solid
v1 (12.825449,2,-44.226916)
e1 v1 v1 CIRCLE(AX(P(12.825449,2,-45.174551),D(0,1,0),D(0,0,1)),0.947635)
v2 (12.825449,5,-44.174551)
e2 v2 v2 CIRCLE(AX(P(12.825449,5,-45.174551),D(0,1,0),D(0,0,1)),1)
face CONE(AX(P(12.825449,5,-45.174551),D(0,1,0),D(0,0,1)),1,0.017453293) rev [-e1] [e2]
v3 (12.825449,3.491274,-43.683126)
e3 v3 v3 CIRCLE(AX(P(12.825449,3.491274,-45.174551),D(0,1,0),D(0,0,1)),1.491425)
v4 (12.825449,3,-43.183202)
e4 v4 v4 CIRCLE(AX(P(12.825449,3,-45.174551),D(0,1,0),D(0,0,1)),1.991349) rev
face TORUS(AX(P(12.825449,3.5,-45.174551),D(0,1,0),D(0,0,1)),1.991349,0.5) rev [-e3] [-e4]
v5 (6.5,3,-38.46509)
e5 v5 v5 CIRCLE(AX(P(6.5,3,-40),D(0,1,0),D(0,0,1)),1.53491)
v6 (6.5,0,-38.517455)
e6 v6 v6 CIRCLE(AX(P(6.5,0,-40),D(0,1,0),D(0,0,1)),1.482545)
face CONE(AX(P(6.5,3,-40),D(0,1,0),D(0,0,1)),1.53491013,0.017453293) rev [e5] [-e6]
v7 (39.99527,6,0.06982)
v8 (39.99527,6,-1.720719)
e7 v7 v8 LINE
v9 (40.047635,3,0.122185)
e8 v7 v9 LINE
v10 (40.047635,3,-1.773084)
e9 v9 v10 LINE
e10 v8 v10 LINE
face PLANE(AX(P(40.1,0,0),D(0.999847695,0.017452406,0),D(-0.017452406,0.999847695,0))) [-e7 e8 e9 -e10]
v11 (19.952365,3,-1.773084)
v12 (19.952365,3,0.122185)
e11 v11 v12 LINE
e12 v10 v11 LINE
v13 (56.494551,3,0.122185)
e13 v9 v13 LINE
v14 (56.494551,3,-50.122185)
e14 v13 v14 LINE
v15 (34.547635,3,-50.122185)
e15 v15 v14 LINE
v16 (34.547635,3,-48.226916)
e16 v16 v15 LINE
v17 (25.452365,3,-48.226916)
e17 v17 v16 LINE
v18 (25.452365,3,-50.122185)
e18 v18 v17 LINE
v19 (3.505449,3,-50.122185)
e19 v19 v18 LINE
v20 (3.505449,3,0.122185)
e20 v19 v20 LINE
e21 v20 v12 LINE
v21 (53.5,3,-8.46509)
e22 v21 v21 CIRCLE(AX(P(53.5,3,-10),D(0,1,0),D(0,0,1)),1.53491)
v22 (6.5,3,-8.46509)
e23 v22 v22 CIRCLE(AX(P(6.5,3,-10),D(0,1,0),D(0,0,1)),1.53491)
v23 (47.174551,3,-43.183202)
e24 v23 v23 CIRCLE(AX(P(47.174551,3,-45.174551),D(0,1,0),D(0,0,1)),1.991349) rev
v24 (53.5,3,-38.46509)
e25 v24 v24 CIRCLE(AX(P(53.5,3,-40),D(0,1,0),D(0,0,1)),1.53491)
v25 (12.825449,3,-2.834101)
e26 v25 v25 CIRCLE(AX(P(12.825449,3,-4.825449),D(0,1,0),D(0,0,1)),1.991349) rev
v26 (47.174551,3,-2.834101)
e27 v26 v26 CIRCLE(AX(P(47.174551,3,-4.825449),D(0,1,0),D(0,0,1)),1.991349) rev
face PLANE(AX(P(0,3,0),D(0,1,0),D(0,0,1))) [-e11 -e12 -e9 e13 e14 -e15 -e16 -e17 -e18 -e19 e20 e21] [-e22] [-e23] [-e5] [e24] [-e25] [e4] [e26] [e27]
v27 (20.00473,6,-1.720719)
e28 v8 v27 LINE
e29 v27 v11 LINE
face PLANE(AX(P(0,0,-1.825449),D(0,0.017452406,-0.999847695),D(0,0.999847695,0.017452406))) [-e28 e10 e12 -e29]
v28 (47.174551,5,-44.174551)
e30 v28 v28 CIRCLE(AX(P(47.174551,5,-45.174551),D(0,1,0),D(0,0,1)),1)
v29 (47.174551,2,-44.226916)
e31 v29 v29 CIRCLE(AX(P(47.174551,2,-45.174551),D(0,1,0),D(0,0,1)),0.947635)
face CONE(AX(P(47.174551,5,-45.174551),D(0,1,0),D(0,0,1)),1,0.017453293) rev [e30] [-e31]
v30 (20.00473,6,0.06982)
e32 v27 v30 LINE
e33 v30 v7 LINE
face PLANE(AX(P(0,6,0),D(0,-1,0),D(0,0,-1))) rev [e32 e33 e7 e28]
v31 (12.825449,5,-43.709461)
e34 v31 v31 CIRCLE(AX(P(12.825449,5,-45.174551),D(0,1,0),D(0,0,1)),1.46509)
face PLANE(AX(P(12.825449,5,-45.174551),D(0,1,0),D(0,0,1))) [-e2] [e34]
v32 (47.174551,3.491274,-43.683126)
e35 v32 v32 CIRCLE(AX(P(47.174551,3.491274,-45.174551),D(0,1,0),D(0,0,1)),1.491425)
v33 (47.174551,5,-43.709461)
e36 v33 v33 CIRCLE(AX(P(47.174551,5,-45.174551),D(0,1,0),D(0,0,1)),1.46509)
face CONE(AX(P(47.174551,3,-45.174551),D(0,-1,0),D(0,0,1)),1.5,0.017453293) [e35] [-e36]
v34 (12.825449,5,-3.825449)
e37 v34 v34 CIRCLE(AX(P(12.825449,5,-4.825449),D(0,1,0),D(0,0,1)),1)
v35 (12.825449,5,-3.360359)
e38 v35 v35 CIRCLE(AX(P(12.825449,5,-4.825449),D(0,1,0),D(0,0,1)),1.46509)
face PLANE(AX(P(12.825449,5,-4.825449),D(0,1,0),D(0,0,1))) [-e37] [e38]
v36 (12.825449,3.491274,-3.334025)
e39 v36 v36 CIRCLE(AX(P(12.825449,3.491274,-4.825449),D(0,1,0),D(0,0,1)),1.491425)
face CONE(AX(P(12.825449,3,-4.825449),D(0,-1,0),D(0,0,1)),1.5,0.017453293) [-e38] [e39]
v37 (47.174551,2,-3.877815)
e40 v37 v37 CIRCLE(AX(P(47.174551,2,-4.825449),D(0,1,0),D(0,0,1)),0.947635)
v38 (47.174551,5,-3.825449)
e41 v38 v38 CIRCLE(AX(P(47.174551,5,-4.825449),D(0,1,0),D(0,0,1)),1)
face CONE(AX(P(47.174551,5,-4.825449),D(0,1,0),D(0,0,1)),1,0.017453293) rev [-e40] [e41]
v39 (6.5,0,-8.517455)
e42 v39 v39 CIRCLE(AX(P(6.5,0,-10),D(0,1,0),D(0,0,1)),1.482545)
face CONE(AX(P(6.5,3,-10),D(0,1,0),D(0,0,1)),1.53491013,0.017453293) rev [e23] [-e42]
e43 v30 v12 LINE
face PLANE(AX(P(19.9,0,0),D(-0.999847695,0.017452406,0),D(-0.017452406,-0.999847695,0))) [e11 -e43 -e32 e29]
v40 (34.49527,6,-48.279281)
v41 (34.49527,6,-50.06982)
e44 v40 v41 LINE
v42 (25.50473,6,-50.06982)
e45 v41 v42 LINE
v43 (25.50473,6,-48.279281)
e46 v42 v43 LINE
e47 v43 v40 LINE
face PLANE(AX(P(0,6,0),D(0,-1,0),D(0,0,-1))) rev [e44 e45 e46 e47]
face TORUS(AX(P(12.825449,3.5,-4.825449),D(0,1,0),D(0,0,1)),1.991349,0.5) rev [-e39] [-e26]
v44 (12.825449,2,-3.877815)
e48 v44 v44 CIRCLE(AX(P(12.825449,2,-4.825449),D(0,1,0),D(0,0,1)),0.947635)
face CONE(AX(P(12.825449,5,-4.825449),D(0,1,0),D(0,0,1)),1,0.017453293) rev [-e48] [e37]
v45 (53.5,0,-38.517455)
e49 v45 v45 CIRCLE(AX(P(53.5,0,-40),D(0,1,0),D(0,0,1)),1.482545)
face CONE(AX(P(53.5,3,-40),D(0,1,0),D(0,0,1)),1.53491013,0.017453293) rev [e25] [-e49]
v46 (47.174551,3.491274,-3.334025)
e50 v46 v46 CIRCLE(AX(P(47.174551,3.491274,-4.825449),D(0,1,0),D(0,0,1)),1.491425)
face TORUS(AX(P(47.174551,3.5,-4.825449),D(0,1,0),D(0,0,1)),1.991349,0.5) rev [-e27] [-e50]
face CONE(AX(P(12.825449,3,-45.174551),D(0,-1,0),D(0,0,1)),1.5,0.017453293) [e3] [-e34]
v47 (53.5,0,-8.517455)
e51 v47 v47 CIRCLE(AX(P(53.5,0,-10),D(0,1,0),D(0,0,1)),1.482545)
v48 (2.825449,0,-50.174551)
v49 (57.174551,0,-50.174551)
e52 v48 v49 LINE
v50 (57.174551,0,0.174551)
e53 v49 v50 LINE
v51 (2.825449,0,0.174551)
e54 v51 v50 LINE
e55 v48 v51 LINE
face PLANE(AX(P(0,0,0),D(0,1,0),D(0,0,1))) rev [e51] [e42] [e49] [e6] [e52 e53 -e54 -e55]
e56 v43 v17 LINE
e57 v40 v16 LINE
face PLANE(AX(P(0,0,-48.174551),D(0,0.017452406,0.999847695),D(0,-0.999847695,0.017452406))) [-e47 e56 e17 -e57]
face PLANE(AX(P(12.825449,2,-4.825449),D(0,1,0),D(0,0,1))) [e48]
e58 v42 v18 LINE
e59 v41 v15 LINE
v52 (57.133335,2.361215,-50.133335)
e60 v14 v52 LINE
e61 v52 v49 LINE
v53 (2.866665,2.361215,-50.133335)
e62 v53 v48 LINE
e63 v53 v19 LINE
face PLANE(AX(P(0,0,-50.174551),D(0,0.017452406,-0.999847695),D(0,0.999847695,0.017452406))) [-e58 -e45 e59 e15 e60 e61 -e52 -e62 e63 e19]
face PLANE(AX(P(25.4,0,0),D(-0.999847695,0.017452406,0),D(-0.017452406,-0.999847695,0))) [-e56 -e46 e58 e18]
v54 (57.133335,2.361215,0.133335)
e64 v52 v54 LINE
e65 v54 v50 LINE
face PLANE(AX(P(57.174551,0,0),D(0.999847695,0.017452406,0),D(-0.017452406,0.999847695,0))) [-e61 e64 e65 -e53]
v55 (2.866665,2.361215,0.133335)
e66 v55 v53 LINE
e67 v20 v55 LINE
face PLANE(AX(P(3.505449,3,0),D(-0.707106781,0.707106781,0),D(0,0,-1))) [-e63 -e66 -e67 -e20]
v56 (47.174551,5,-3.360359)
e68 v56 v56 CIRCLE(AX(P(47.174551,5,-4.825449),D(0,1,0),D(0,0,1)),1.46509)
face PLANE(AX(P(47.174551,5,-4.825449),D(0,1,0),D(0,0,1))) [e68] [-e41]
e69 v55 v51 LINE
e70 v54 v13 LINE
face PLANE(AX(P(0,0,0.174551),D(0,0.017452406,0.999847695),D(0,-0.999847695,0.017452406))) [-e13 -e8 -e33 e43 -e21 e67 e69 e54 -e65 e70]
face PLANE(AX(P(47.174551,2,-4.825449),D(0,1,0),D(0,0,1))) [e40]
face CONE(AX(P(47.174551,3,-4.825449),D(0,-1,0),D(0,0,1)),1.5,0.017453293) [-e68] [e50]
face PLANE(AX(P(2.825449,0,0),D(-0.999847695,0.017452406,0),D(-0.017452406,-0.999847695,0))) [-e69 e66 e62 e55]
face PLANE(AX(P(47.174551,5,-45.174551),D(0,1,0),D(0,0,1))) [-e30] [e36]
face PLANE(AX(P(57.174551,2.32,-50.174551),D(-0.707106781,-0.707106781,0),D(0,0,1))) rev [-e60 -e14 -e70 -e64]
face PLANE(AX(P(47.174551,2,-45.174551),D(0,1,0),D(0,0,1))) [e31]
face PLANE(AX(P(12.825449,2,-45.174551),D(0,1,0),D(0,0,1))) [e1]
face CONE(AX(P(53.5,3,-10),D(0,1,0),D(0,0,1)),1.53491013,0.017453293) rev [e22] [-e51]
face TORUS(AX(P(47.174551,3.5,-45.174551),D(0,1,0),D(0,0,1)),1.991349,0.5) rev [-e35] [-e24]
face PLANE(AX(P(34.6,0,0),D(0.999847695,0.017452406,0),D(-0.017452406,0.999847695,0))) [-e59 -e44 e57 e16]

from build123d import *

# Parameters (mm, degrees)
SKETCH1_W                     = 54.349101298
SKETCH1_H                     = 50.349101298
BOSS_EXTRUDE2_DEPTH           = 3
SKETCH7_R                     = 1.53491013
CUT_EXTRUDE1_DEPTH            = 77.127621628
CUT_EXTRUDE1_DRAFT            = -1
CUT_EXTRUDE1_PROFILE_2_DEPTH  = 77.127621628
CUT_EXTRUDE1_PROFILE_2_DRAFT  = -1
CUT_EXTRUDE1_PROFILE_3_DEPTH  = 77.127621628
CUT_EXTRUDE1_PROFILE_3_DRAFT  = -1
CUT_EXTRUDE1_PROFILE_4_DEPTH  = 77.127621628
CUT_EXTRUDE1_PROFILE_4_DRAFT  = -1
SKETCH8_W                     = 20.2
SKETCH8_H                     = 2
SKETCH8_W_2                   = 9.2
BOSS_EXTRUDE3_DEPTH           = 3
FILLET1_SIZE                  = 0.68
SKETCH9_R                     = 1.5
BOSS_EXTRUDE4_DEPTH           = 2
BOSS_EXTRUDE4_DRAFT           = 1
BOSS_EXTRUDE4_PROFILE_2_DEPTH = 2
BOSS_EXTRUDE4_PROFILE_2_DRAFT = 1
BOSS_EXTRUDE4_PROFILE_3_DEPTH = 2
BOSS_EXTRUDE4_PROFILE_3_DRAFT = 1
BOSS_EXTRUDE4_PROFILE_4_DEPTH = 2
BOSS_EXTRUDE4_PROFILE_4_DRAFT = 1
SKETCH10_R                    = 1
CUT_EXTRUDE2_DEPTH            = 3
CUT_EXTRUDE2_DRAFT            = -1
CUT_EXTRUDE2_PROFILE_2_DEPTH  = 3
CUT_EXTRUDE2_PROFILE_2_DRAFT  = -1
CUT_EXTRUDE2_PROFILE_3_DEPTH  = 3
CUT_EXTRUDE2_PROFILE_3_DRAFT  = -1
CUT_EXTRUDE2_PROFILE_4_DEPTH  = 3
CUT_EXTRUDE2_PROFILE_4_DRAFT  = -1
FILLET2_R                     = 0.5
DRAFT1_ANGLE                  = -1


with BuildPart() as part:
    # Sketch1 → Boss-Extrude2 (new body)
    with BuildSketch(Plane(origin=(0, 0, 0), x_dir=(-1, 0, 0), z_dir=(0, -1, 0))):
        with Locations((-30, 25)):
            Rectangle(SKETCH1_W, SKETCH1_H)
    extrude(amount=-BOSS_EXTRUDE2_DEPTH)


with BuildPart() as cut_extrude1_tool:
    # Sketch7 → Cut-Extrude1 (with draft: the straight prism first)
    with BuildSketch(Plane(origin=(0, 3, 0), x_dir=(1, 0, 0), z_dir=(0, 1, 0))):
        with Locations((6.5, 40)):
            Circle(SKETCH7_R)
    extrude(amount=-CUT_EXTRUDE1_DEPTH)
    # Cut-Extrude1: the draft: its side faces are tilted about the plane it starts from
    cut_extrude1_sides = [cut_extrude1_tool.faces().sort_by_distance(p)[0] for p in [
        (4.96508987, -35.563810814, -40),
    ]]
    draft(cut_extrude1_sides, Plane(origin=(0, 3, 0), x_dir=(1, 0, 0), z_dir=(0, 1, 0)), CUT_EXTRUDE1_DRAFT)


with BuildPart() as part_1:
    add(part.part)

    # Cut-Extrude1: cut by cut_extrude1_tool
    add(cut_extrude1_tool.part, mode=Mode.SUBTRACT)


with BuildPart() as cut_extrude1_profile_2_tool:
    # Sketch7 → Cut-Extrude1 profile 2 (with draft: the straight prism first)
    with BuildSketch(Plane(origin=(0, 3, 0), x_dir=(1, 0, 0), z_dir=(0, 1, 0))):
        with Locations((6.5, 10)):
            Circle(SKETCH7_R)
    extrude(amount=-CUT_EXTRUDE1_PROFILE_2_DEPTH)
    # Cut-Extrude1 profile 2: the draft: its side faces are tilted about the plane it starts from
    cut_extrude1_profile_2_sides = [cut_extrude1_profile_2_tool.faces().sort_by_distance(p)[0] for p in [
        (4.96508987, -35.563810814, -10),
    ]]
    draft(cut_extrude1_profile_2_sides, Plane(origin=(0, 3, 0), x_dir=(1, 0, 0), z_dir=(0, 1, 0)), CUT_EXTRUDE1_PROFILE_2_DRAFT)


with BuildPart() as part_2:
    add(part_1.part)

    # Cut-Extrude1 profile 2: cut by cut_extrude1_profile_2_tool
    add(cut_extrude1_profile_2_tool.part, mode=Mode.SUBTRACT)


with BuildPart() as cut_extrude1_profile_3_tool:
    # Sketch7 → Cut-Extrude1 profile 3 (with draft: the straight prism first)
    with BuildSketch(Plane(origin=(0, 3, 0), x_dir=(1, 0, 0), z_dir=(0, 1, 0))):
        with Locations((53.5, 10)):
            Circle(SKETCH7_R)
    extrude(amount=-CUT_EXTRUDE1_PROFILE_3_DEPTH)
    # Cut-Extrude1 profile 3: the draft: its side faces are tilted about the plane it starts from
    cut_extrude1_profile_3_sides = [cut_extrude1_profile_3_tool.faces().sort_by_distance(p)[0] for p in [
        (51.96508987, -35.563810814, -10),
    ]]
    draft(cut_extrude1_profile_3_sides, Plane(origin=(0, 3, 0), x_dir=(1, 0, 0), z_dir=(0, 1, 0)), CUT_EXTRUDE1_PROFILE_3_DRAFT)


with BuildPart() as part_3:
    add(part_2.part)

    # Cut-Extrude1 profile 3: cut by cut_extrude1_profile_3_tool
    add(cut_extrude1_profile_3_tool.part, mode=Mode.SUBTRACT)


with BuildPart() as cut_extrude1_profile_4_tool:
    # Sketch7 → Cut-Extrude1 profile 4 (with draft: the straight prism first)
    with BuildSketch(Plane(origin=(0, 3, 0), x_dir=(1, 0, 0), z_dir=(0, 1, 0))):
        with Locations((53.5, 40)):
            Circle(SKETCH7_R)
    extrude(amount=-CUT_EXTRUDE1_PROFILE_4_DEPTH)
    # Cut-Extrude1 profile 4: the draft: its side faces are tilted about the plane it starts from
    cut_extrude1_profile_4_sides = [cut_extrude1_profile_4_tool.faces().sort_by_distance(p)[0] for p in [
        (51.96508987, -35.563810814, -40),
    ]]
    draft(cut_extrude1_profile_4_sides, Plane(origin=(0, 3, 0), x_dir=(1, 0, 0), z_dir=(0, 1, 0)), CUT_EXTRUDE1_PROFILE_4_DRAFT)


with BuildPart() as part_4:
    add(part_3.part)

    # Cut-Extrude1 profile 4: cut by cut_extrude1_profile_4_tool
    add(cut_extrude1_profile_4_tool.part, mode=Mode.SUBTRACT)

    # Sketch8 → Boss-Extrude3 (add)
    with BuildSketch(Plane(origin=(0, 3, 0), x_dir=(1, 0, 0), z_dir=(0, 1, 0))):
        with Locations((30, 0.825449351)):
            Rectangle(SKETCH8_W, SKETCH8_H)
        with Locations((30, 49.174550649)):
            Rectangle(SKETCH8_W_2, SKETCH8_H)
    extrude(amount=BOSS_EXTRUDE3_DEPTH)

    # Fillet1
    fillet1_edges = [part_4.edges().sort_by_distance(p)[0] for p in [
        (57.174550649, 3, -25),
        (2.825449351, 3, -25),
    ]]
    chamfer(fillet1_edges, length=FILLET1_SIZE)


with BuildPart() as boss_extrude4_tool:
    # Sketch9 → Boss-Extrude4 (with draft: the straight prism first)
    with BuildSketch(Plane(origin=(0, 3, 0), x_dir=(1, 0, 0), z_dir=(0, 1, 0))):
        with Locations((12.825449351, 45.174550649)):
            Circle(SKETCH9_R)
    extrude(amount=BOSS_EXTRUDE4_DEPTH)
    # Boss-Extrude4: the draft: its side faces are tilted about the plane it starts from
    boss_extrude4_sides = [boss_extrude4_tool.faces().sort_by_distance(p)[0] for p in [
        (11.325449351, 4, -45.174550649),
    ]]
    draft(boss_extrude4_sides, Plane(origin=(0, 3, 0), x_dir=(1, 0, 0), z_dir=(0, 1, 0)), BOSS_EXTRUDE4_DRAFT)


with BuildPart() as part_5:
    add(part_4.part)

    # Boss-Extrude4: add boss_extrude4_tool
    add(boss_extrude4_tool.part)


with BuildPart() as boss_extrude4_profile_2_tool:
    # Sketch9 → Boss-Extrude4 profile 2 (with draft: the straight prism first)
    with BuildSketch(Plane(origin=(0, 3, 0), x_dir=(1, 0, 0), z_dir=(0, 1, 0))):
        with Locations((47.174550649, 45.174550649)):
            Circle(SKETCH9_R)
    extrude(amount=BOSS_EXTRUDE4_PROFILE_2_DEPTH)
    # Boss-Extrude4 profile 2: the draft: its side faces are tilted about the plane it starts from
    boss_extrude4_profile_2_sides = [boss_extrude4_profile_2_tool.faces().sort_by_distance(p)[0] for p in [
        (45.674550649, 4, -45.174550649),
    ]]
    draft(boss_extrude4_profile_2_sides, Plane(origin=(0, 3, 0), x_dir=(1, 0, 0), z_dir=(0, 1, 0)), BOSS_EXTRUDE4_PROFILE_2_DRAFT)


with BuildPart() as part_6:
    add(part_5.part)

    # Boss-Extrude4 profile 2: add boss_extrude4_profile_2_tool
    add(boss_extrude4_profile_2_tool.part)


with BuildPart() as boss_extrude4_profile_3_tool:
    # Sketch9 → Boss-Extrude4 profile 3 (with draft: the straight prism first)
    with BuildSketch(Plane(origin=(0, 3, 0), x_dir=(1, 0, 0), z_dir=(0, 1, 0))):
        with Locations((12.825449351, 4.825449351)):
            Circle(SKETCH9_R)
    extrude(amount=BOSS_EXTRUDE4_PROFILE_3_DEPTH)
    # Boss-Extrude4 profile 3: the draft: its side faces are tilted about the plane it starts from
    boss_extrude4_profile_3_sides = [boss_extrude4_profile_3_tool.faces().sort_by_distance(p)[0] for p in [
        (11.325449351, 4, -4.825449351),
    ]]
    draft(boss_extrude4_profile_3_sides, Plane(origin=(0, 3, 0), x_dir=(1, 0, 0), z_dir=(0, 1, 0)), BOSS_EXTRUDE4_PROFILE_3_DRAFT)


with BuildPart() as part_7:
    add(part_6.part)

    # Boss-Extrude4 profile 3: add boss_extrude4_profile_3_tool
    add(boss_extrude4_profile_3_tool.part)


with BuildPart() as boss_extrude4_profile_4_tool:
    # Sketch9 → Boss-Extrude4 profile 4 (with draft: the straight prism first)
    with BuildSketch(Plane(origin=(0, 3, 0), x_dir=(1, 0, 0), z_dir=(0, 1, 0))):
        with Locations((47.174550649, 4.825449351)):
            Circle(SKETCH9_R)
    extrude(amount=BOSS_EXTRUDE4_PROFILE_4_DEPTH)
    # Boss-Extrude4 profile 4: the draft: its side faces are tilted about the plane it starts from
    boss_extrude4_profile_4_sides = [boss_extrude4_profile_4_tool.faces().sort_by_distance(p)[0] for p in [
        (45.674550649, 4, -4.825449351),
    ]]
    draft(boss_extrude4_profile_4_sides, Plane(origin=(0, 3, 0), x_dir=(1, 0, 0), z_dir=(0, 1, 0)), BOSS_EXTRUDE4_PROFILE_4_DRAFT)


with BuildPart() as part_8:
    add(part_7.part)

    # Boss-Extrude4 profile 4: add boss_extrude4_profile_4_tool
    add(boss_extrude4_profile_4_tool.part)


with BuildPart() as cut_extrude2_tool:
    # Sketch10 → Cut-Extrude2 (with draft: the straight prism first)
    with BuildSketch(Plane(origin=(0, 5, 0), x_dir=(1, 0, 0), z_dir=(0, 1, 0))):
        with Locations((12.825449351, 45.174550649)):
            Circle(SKETCH10_R)
    extrude(amount=-CUT_EXTRUDE2_DEPTH)
    # Cut-Extrude2: the draft: its side faces are tilted about the plane it starts from
    cut_extrude2_sides = [cut_extrude2_tool.faces().sort_by_distance(p)[0] for p in [
        (11.825449351, 3.5, -45.174550649),
    ]]
    draft(cut_extrude2_sides, Plane(origin=(0, 5, 0), x_dir=(1, 0, 0), z_dir=(0, 1, 0)), CUT_EXTRUDE2_DRAFT)


with BuildPart() as part_9:
    add(part_8.part)

    # Cut-Extrude2: cut by cut_extrude2_tool
    add(cut_extrude2_tool.part, mode=Mode.SUBTRACT)


with BuildPart() as cut_extrude2_profile_2_tool:
    # Sketch10 → Cut-Extrude2 profile 2 (with draft: the straight prism first)
    with BuildSketch(Plane(origin=(0, 5, 0), x_dir=(1, 0, 0), z_dir=(0, 1, 0))):
        with Locations((47.174550649, 45.174550649)):
            Circle(SKETCH10_R)
    extrude(amount=-CUT_EXTRUDE2_PROFILE_2_DEPTH)
    # Cut-Extrude2 profile 2: the draft: its side faces are tilted about the plane it starts from
    cut_extrude2_profile_2_sides = [cut_extrude2_profile_2_tool.faces().sort_by_distance(p)[0] for p in [
        (46.174550649, 3.5, -45.174550649),
    ]]
    draft(cut_extrude2_profile_2_sides, Plane(origin=(0, 5, 0), x_dir=(1, 0, 0), z_dir=(0, 1, 0)), CUT_EXTRUDE2_PROFILE_2_DRAFT)


with BuildPart() as part_10:
    add(part_9.part)

    # Cut-Extrude2 profile 2: cut by cut_extrude2_profile_2_tool
    add(cut_extrude2_profile_2_tool.part, mode=Mode.SUBTRACT)


with BuildPart() as cut_extrude2_profile_3_tool:
    # Sketch10 → Cut-Extrude2 profile 3 (with draft: the straight prism first)
    with BuildSketch(Plane(origin=(0, 5, 0), x_dir=(1, 0, 0), z_dir=(0, 1, 0))):
        with Locations((12.825449351, 4.825449351)):
            Circle(SKETCH10_R)
    extrude(amount=-CUT_EXTRUDE2_PROFILE_3_DEPTH)
    # Cut-Extrude2 profile 3: the draft: its side faces are tilted about the plane it starts from
    cut_extrude2_profile_3_sides = [cut_extrude2_profile_3_tool.faces().sort_by_distance(p)[0] for p in [
        (11.825449351, 3.5, -4.825449351),
    ]]
    draft(cut_extrude2_profile_3_sides, Plane(origin=(0, 5, 0), x_dir=(1, 0, 0), z_dir=(0, 1, 0)), CUT_EXTRUDE2_PROFILE_3_DRAFT)


with BuildPart() as part_11:
    add(part_10.part)

    # Cut-Extrude2 profile 3: cut by cut_extrude2_profile_3_tool
    add(cut_extrude2_profile_3_tool.part, mode=Mode.SUBTRACT)


with BuildPart() as cut_extrude2_profile_4_tool:
    # Sketch10 → Cut-Extrude2 profile 4 (with draft: the straight prism first)
    with BuildSketch(Plane(origin=(0, 5, 0), x_dir=(1, 0, 0), z_dir=(0, 1, 0))):
        with Locations((47.174550649, 4.825449351)):
            Circle(SKETCH10_R)
    extrude(amount=-CUT_EXTRUDE2_PROFILE_4_DEPTH)
    # Cut-Extrude2 profile 4: the draft: its side faces are tilted about the plane it starts from
    cut_extrude2_profile_4_sides = [cut_extrude2_profile_4_tool.faces().sort_by_distance(p)[0] for p in [
        (46.174550649, 3.5, -4.825449351),
    ]]
    draft(cut_extrude2_profile_4_sides, Plane(origin=(0, 5, 0), x_dir=(1, 0, 0), z_dir=(0, 1, 0)), CUT_EXTRUDE2_PROFILE_4_DRAFT)


with BuildPart() as part_12:
    add(part_11.part)

    # Cut-Extrude2 profile 4: cut by cut_extrude2_profile_4_tool
    add(cut_extrude2_profile_4_tool.part, mode=Mode.SUBTRACT)

    # Fillet2
    fillet2_edges = [part_12.edges().sort_by_distance(p)[0] for p in [
        (11.325449351, 3, -45.174550649),
        (45.674550649, 3, -45.174550649),
        (11.325449351, 3, -4.825449351),
        (45.674550649, 3, -4.825449351),
    ]]
    fillet(fillet2_edges, radius=FILLET2_R)

    # Draft1
    draft1_faces = [part_12.faces().sort_by_distance(p)[0] for p in [
        (57.174550649, 1.16, -25),
        (2.825449351, 1.16, -25),
        (25.4, 4.5, -49.174550649),
        (30, 1.932269907, -50.174550649),
        (34.6, 4.5, -49.174550649),
        (30, 4.5, -48.174550649),
        (19.9, 4.5, -0.825449351),
        (40.1, 4.5, -0.825449351),
        (30, 4.5, -1.825449351),
        (30, 2.311933099, 0.174550649),
    ]]
    draft(draft1_faces, Plane(origin=(0, 0, 0), x_dir=(0, 0, -1), z_dir=(0, -1, 0)), DRAFT1_ANGLE)


solid = part_12.part
